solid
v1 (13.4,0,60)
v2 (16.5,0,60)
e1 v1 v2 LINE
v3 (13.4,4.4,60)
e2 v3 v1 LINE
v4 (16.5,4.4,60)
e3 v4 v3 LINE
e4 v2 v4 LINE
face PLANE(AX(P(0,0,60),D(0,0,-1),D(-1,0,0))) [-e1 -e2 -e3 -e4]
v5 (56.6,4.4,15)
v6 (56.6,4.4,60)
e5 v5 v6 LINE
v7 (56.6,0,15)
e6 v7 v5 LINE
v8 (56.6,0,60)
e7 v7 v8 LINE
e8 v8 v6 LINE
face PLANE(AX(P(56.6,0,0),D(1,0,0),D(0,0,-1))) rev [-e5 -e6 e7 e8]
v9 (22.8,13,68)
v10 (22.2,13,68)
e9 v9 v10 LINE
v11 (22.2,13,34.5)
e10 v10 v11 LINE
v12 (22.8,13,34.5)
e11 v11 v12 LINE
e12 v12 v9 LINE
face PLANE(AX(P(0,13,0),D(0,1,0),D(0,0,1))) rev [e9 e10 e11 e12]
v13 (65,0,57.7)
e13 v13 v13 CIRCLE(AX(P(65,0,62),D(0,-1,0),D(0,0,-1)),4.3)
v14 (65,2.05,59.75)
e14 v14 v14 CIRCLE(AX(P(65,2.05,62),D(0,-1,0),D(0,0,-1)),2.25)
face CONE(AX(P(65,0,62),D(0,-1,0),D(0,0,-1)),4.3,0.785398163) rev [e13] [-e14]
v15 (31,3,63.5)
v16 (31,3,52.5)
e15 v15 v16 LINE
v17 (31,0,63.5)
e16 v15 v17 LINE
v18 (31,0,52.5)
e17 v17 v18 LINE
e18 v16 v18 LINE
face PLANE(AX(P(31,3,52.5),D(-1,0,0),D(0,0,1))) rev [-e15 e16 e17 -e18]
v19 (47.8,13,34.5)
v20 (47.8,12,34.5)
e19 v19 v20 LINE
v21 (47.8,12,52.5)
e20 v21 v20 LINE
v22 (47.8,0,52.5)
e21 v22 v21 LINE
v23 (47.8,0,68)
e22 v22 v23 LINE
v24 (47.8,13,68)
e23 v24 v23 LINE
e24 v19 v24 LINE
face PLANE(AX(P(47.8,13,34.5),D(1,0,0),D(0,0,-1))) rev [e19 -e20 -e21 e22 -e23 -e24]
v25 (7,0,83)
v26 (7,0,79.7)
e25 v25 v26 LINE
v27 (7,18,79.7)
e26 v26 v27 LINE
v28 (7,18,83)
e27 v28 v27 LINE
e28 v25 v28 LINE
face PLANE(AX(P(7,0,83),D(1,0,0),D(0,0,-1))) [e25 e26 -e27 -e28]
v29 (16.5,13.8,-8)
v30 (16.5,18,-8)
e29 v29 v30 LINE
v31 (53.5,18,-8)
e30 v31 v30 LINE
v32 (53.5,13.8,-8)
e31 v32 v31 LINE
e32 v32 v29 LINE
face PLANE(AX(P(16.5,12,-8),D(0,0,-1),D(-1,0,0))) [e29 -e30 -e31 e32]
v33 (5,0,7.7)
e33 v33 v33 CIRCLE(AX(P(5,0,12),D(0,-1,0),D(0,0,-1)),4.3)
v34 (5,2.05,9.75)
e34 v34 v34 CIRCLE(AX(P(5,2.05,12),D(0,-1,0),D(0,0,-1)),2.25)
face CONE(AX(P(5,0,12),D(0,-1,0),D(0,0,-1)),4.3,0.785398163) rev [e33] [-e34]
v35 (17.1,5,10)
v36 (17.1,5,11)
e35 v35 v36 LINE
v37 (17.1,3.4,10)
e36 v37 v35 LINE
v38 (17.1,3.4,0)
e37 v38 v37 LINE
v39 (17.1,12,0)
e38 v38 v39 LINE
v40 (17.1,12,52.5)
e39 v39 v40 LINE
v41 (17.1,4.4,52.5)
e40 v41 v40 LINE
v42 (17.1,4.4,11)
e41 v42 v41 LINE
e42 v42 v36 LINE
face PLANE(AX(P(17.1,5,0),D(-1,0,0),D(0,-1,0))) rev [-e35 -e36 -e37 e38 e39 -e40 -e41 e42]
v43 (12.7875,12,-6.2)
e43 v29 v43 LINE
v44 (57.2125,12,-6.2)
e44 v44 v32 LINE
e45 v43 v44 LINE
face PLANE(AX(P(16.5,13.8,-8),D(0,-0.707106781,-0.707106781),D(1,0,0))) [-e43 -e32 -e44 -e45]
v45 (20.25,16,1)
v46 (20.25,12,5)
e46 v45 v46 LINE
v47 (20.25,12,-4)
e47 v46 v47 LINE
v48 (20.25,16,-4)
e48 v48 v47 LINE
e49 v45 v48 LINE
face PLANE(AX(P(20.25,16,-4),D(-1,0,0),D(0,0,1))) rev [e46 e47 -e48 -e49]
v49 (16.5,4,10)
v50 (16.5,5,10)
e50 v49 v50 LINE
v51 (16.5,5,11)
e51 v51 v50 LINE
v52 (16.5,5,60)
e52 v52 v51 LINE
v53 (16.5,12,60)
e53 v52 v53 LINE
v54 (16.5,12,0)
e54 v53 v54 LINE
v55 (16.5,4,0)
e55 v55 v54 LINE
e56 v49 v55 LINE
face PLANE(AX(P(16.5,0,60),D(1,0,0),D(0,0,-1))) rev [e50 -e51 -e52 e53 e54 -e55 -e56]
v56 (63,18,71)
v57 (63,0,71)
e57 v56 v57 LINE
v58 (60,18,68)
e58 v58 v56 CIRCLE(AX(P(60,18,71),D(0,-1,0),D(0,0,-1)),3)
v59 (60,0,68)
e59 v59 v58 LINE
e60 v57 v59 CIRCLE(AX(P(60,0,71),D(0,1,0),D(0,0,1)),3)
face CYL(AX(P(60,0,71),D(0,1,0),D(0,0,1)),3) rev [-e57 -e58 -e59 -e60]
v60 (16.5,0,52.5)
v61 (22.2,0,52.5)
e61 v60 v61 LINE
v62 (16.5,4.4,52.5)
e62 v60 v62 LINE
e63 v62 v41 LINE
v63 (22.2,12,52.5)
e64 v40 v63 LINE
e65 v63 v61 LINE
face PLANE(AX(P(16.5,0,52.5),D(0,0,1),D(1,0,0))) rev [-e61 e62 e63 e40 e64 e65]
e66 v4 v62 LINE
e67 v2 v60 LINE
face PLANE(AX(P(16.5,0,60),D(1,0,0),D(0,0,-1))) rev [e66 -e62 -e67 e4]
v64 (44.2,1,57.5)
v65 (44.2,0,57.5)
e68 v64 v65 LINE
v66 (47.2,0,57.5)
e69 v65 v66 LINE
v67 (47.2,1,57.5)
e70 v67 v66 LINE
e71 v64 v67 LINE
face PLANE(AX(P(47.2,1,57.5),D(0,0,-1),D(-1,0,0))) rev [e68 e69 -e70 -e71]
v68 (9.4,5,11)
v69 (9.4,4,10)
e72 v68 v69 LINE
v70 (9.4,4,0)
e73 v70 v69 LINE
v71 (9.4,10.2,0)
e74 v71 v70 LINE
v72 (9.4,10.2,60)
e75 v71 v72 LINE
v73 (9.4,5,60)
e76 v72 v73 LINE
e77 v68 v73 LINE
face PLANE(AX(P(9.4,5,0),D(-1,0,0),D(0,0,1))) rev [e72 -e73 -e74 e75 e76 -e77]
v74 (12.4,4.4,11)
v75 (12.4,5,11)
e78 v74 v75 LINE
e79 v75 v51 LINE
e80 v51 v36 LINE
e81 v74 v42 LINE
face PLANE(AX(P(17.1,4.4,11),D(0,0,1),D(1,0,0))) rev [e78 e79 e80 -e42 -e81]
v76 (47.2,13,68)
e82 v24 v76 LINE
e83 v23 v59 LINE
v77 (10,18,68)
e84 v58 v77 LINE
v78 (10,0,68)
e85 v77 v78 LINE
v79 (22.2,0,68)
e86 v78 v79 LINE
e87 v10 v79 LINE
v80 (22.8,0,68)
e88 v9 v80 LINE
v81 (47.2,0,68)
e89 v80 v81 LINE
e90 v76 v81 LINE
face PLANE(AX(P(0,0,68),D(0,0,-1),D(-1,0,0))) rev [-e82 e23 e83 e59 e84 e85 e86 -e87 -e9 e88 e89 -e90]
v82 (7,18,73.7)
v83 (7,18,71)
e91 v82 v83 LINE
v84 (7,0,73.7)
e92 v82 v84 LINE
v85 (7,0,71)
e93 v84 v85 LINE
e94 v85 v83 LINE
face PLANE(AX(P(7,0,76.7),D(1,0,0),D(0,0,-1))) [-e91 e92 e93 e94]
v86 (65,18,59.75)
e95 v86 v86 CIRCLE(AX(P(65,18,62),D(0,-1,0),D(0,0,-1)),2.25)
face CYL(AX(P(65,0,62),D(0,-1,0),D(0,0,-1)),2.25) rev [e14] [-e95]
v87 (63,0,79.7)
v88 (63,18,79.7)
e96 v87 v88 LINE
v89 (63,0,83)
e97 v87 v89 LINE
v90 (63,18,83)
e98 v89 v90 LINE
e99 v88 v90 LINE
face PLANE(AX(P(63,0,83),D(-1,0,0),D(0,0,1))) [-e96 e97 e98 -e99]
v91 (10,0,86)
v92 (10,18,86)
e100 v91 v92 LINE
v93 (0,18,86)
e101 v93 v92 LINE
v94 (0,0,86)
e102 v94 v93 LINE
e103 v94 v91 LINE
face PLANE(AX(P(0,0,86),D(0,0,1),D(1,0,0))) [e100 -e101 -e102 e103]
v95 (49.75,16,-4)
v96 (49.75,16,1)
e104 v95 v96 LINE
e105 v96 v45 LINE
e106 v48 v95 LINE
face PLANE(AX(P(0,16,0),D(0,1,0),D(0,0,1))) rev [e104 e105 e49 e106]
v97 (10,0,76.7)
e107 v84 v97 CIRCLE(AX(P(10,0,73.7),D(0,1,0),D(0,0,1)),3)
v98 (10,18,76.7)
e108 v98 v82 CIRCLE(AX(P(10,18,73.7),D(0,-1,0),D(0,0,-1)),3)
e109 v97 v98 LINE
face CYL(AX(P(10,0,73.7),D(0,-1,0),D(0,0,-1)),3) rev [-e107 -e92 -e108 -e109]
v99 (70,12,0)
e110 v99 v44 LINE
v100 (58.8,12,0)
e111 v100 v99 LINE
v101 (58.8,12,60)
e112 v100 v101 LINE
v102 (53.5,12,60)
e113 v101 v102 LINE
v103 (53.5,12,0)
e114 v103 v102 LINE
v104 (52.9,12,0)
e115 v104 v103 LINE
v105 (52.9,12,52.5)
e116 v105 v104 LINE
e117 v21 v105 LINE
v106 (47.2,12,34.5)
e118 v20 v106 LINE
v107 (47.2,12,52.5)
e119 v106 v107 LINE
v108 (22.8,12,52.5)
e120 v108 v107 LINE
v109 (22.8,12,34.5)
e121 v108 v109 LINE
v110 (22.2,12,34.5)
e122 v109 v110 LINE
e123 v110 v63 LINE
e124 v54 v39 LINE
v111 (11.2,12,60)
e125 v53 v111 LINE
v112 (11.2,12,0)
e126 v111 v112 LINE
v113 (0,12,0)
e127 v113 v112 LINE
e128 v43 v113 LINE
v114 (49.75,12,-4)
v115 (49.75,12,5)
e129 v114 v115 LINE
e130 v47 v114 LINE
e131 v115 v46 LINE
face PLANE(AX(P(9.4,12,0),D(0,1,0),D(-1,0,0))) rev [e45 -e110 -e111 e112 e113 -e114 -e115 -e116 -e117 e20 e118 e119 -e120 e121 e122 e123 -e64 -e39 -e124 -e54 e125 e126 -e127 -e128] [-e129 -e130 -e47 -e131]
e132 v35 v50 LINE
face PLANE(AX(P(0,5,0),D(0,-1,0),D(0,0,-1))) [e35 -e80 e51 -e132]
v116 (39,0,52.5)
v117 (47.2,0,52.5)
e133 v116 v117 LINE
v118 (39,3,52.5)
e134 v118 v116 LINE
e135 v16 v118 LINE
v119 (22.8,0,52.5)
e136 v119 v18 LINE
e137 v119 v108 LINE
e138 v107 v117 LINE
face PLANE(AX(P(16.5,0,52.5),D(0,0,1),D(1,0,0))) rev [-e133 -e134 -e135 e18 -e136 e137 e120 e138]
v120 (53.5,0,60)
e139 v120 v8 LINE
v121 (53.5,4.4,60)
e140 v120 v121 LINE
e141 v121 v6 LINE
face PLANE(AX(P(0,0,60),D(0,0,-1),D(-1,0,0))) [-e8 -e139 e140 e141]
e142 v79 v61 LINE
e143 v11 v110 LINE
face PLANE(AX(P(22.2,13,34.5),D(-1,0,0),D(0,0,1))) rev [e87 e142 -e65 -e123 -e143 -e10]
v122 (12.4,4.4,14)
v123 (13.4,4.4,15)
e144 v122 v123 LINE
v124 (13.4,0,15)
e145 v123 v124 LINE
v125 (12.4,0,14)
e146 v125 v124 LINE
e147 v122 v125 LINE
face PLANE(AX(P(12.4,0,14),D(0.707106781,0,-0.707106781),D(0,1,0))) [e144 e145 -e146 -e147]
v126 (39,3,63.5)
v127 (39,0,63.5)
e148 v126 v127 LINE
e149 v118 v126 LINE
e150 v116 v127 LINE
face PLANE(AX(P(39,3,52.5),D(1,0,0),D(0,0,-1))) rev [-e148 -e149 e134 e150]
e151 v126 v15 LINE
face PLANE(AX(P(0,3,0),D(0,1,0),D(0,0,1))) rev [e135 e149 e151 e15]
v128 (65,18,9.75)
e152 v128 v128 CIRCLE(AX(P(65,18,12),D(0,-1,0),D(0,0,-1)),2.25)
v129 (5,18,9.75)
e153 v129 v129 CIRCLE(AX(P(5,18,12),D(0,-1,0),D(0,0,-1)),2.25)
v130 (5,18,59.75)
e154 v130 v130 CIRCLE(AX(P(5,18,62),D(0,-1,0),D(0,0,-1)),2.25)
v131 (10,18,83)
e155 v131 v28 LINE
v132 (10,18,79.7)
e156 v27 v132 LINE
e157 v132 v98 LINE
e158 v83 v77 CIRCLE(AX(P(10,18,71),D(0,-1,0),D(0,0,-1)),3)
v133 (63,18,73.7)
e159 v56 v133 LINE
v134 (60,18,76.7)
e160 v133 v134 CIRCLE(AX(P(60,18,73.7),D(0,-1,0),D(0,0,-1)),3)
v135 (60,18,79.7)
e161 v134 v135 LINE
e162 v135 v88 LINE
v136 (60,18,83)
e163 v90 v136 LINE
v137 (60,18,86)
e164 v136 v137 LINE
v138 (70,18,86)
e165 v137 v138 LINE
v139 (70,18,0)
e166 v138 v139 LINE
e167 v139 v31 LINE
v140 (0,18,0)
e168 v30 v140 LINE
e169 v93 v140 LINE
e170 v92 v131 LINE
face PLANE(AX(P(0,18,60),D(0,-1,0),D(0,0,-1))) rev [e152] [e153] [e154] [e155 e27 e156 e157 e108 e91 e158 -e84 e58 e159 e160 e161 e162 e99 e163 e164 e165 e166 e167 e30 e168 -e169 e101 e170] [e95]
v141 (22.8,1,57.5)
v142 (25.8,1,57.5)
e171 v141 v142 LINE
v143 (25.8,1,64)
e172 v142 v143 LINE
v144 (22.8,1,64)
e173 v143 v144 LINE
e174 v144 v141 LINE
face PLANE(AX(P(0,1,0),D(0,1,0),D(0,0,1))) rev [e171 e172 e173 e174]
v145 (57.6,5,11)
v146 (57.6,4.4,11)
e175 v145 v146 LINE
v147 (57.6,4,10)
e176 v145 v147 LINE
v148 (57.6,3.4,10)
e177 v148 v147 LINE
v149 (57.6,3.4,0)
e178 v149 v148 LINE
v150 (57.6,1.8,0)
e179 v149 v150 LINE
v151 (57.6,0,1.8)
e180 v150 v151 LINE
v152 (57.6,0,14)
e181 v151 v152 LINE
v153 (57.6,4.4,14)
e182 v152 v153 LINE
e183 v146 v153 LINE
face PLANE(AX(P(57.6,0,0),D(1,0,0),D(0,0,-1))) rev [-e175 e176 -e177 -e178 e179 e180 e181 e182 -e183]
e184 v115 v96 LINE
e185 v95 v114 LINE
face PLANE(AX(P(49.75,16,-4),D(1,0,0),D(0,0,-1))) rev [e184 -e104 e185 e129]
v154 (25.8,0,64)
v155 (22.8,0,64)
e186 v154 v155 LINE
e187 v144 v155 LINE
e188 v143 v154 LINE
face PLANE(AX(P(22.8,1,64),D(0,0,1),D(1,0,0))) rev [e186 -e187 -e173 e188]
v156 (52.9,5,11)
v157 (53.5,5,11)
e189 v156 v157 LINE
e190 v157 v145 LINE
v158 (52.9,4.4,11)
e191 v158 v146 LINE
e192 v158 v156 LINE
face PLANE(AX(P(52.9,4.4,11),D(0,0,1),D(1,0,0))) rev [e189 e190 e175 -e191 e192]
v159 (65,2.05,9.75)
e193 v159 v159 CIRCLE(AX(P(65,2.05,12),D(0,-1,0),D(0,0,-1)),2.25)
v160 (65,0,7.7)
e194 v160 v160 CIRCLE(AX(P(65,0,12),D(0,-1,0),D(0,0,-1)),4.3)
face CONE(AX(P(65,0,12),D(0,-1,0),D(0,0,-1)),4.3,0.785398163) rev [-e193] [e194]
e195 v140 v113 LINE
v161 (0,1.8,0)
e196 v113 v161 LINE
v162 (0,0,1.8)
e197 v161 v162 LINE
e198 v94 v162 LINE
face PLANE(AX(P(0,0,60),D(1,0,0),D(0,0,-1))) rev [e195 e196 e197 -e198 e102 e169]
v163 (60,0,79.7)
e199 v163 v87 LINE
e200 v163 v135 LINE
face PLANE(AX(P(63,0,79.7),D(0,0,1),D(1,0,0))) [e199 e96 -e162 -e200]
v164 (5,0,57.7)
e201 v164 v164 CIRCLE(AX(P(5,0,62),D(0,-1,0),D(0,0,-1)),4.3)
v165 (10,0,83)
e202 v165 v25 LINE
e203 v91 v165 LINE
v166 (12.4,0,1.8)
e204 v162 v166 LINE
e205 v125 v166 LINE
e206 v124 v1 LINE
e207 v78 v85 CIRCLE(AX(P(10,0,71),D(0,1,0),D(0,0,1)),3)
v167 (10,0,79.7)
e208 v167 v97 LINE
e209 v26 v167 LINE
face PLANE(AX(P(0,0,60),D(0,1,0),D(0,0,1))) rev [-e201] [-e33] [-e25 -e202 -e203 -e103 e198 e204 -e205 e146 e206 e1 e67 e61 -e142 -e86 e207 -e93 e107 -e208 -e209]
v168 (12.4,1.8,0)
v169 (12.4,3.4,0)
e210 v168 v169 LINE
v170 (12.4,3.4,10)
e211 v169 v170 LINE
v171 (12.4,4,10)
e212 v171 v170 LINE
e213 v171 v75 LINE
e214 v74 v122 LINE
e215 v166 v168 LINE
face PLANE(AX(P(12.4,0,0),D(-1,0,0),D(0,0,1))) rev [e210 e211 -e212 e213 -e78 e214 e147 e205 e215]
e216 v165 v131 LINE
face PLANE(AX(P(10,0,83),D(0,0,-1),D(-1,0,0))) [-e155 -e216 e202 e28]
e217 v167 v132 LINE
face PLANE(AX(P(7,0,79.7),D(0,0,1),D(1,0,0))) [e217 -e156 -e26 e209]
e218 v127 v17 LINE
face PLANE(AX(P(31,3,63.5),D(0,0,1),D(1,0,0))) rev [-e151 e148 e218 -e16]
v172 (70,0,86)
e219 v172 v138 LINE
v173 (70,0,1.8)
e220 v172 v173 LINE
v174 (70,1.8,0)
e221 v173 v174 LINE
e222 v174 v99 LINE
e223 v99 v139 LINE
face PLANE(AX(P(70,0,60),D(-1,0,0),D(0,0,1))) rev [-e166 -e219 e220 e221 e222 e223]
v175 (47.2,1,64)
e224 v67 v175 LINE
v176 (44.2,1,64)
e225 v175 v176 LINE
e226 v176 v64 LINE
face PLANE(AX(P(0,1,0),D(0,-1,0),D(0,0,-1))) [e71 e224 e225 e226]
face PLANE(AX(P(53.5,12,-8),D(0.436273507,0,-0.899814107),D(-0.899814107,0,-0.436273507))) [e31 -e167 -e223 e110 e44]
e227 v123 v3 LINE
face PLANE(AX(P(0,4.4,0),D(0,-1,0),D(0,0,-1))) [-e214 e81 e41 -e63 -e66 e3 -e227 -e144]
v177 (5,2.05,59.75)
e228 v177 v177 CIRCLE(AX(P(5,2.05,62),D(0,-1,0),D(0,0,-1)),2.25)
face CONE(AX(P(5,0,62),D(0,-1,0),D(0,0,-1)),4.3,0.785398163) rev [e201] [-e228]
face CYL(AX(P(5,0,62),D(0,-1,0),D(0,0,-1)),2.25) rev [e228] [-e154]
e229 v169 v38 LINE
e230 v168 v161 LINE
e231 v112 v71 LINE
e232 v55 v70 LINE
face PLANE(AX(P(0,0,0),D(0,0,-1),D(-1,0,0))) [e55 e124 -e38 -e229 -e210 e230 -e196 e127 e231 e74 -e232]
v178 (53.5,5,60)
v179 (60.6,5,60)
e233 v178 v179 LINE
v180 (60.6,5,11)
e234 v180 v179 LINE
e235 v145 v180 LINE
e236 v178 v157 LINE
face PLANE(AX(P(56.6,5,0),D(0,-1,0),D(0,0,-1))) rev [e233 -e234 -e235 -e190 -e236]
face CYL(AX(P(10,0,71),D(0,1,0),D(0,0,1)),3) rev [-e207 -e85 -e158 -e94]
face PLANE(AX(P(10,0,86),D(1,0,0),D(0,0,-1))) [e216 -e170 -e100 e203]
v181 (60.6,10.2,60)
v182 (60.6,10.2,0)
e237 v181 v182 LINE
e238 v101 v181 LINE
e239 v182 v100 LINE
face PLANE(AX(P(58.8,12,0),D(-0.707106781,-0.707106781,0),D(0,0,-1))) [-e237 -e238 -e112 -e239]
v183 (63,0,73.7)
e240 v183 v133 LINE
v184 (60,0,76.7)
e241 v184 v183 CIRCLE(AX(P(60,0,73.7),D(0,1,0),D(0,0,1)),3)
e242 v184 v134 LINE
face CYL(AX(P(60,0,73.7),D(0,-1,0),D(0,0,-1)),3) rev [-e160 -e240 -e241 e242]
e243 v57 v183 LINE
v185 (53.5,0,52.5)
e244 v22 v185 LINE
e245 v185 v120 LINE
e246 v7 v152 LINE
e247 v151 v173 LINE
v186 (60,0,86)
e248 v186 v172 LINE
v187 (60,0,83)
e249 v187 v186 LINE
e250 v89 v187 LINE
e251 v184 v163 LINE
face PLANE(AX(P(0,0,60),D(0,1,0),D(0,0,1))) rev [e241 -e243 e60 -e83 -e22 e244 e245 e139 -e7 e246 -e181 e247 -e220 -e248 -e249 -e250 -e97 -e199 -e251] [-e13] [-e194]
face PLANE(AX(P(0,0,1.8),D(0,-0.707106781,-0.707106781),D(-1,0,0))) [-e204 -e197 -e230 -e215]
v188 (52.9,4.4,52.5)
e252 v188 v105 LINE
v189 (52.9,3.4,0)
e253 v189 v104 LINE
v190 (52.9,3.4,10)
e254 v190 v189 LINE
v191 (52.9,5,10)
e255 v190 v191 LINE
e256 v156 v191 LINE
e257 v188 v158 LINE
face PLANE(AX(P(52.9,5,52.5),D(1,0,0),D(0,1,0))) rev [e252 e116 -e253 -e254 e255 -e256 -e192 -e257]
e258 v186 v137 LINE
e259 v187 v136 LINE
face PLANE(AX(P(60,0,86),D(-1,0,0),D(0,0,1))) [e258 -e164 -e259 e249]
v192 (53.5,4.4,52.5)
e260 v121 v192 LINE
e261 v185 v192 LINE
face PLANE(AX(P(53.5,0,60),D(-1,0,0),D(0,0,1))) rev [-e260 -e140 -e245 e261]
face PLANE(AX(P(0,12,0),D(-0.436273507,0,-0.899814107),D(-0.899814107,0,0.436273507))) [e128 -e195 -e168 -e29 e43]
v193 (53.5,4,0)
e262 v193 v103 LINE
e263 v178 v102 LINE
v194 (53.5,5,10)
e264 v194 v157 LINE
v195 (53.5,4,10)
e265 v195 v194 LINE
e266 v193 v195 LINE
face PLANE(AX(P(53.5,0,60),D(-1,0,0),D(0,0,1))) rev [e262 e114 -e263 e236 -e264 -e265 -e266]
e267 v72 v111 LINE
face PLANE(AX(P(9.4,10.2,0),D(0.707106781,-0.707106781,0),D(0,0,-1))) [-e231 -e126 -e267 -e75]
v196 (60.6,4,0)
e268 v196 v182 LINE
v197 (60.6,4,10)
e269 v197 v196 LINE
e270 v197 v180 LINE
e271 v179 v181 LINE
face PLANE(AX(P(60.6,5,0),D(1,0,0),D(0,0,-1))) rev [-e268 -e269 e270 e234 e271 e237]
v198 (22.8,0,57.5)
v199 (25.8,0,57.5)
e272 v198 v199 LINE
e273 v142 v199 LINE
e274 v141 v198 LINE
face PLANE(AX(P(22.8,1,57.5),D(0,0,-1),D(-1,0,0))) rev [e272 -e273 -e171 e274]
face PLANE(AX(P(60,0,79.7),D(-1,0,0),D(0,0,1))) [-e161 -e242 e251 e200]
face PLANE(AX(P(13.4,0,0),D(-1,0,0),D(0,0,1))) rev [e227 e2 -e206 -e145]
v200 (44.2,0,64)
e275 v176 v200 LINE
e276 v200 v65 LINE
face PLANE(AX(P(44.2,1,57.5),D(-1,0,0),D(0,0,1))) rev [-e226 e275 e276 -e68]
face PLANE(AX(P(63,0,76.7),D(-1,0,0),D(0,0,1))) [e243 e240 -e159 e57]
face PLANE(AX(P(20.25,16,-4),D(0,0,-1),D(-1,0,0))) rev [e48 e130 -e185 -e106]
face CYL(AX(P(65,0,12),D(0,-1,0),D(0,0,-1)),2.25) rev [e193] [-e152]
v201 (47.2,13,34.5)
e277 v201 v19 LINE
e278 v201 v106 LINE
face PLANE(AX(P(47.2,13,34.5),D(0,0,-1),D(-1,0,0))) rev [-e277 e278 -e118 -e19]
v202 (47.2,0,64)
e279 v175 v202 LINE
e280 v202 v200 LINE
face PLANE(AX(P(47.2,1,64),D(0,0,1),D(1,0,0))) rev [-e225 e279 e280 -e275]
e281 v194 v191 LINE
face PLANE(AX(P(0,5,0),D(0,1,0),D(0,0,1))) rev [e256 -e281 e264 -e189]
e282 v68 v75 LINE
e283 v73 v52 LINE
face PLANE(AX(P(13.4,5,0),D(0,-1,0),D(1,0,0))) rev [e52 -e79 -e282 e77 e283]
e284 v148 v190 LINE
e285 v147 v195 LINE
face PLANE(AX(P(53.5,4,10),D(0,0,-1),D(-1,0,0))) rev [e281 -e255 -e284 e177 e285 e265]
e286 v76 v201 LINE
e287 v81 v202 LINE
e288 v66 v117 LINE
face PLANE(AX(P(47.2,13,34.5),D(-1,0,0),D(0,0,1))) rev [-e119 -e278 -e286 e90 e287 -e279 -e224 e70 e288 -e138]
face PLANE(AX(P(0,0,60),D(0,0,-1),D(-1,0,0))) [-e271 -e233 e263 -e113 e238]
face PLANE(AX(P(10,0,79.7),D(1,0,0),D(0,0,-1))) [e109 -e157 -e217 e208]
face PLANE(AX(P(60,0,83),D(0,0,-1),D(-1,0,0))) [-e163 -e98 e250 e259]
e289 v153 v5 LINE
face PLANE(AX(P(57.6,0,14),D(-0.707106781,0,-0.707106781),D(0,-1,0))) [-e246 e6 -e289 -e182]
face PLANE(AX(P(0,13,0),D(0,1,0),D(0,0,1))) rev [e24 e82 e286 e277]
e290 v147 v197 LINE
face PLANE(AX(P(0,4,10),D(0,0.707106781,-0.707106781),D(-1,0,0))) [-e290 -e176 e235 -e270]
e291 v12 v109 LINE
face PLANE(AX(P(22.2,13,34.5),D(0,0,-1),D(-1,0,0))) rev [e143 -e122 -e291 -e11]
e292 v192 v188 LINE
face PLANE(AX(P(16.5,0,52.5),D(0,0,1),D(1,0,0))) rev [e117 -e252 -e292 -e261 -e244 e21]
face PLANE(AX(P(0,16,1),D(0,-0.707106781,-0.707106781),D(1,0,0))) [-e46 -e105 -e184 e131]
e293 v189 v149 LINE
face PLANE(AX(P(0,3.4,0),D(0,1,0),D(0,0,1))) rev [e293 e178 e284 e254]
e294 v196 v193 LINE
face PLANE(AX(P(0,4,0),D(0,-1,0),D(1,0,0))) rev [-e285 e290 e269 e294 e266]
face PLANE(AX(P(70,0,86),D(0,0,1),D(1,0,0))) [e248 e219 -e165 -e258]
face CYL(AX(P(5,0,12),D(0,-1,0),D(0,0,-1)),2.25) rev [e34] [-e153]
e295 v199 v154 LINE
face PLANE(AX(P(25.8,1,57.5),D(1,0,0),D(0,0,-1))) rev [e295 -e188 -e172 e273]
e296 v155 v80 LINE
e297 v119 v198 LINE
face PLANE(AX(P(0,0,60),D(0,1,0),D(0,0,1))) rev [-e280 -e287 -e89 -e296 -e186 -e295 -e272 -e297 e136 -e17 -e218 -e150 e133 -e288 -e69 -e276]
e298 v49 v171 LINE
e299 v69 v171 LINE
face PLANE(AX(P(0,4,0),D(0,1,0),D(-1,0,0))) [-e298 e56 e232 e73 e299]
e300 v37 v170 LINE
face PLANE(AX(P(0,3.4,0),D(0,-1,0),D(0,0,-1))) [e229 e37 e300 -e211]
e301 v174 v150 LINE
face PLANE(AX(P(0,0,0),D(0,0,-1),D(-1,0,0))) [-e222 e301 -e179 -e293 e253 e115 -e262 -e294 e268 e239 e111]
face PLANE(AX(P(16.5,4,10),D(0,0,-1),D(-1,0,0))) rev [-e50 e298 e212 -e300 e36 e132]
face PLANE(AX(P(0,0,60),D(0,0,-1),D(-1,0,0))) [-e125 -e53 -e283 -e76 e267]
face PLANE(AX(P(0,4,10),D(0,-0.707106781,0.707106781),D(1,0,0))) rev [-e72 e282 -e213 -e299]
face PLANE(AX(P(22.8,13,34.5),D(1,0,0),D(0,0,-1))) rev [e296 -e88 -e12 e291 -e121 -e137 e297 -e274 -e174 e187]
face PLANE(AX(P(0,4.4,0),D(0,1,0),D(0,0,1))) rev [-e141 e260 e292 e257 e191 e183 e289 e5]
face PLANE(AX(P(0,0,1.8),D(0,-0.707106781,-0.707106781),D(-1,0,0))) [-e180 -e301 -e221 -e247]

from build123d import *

# Parameters (mm, degrees)
SKETCH_1_W                = 70
SKETCH_1_H                = 18
EXTRUDE_1_DEPTH           = 60
CUT_EXTRUDE_1_DEPTH       = 94.936148527
SKETCH_3_W                = 15
SKETCH_3_H                = 5
CUT_EXTRUDE_2_DEPTH       = 1
SKETCH_4_W                = 15
SKETCH_4_H                = 5
CUT_EXTRUDE_3_DEPTH       = 1
SKETCH_5_W                = 3
SKETCH_5_H                = 11
CUT_EXTRUDE_4_DEPTH       = 1
SKETCH_6_W                = 3
SKETCH_6_H                = 11
CUT_EXTRUDE_5_DEPTH       = 1
CHAMFER_1_SIZE            = 1
EXTRUDE_9_DEPTH           = 6
SKETCH_7_W                = 29.5
SKETCH_7_H                = 9
CUT_EXTRUDE_7_DEPTH       = 4
SKETCH_9_W                = 37
SKETCH_9_H                = 7.5
EXTRUDE_3_DEPTH           = 12
SKETCH_10_W               = 70
SKETCH_10_H               = 18
EXTRUDE_4_DEPTH           = 8
CHAMFER_4_SIZE            = 4
SKETCH_11_W               = 8
SKETCH_11_H               = 11
CUT_EXTRUDE_8_DEPTH       = 3
SKETCH_12_W               = 0.6
SKETCH_12_H               = 33.5
CUT_EXTRUDE_9_DEPTH       = 13
SKETCH_13_W               = 0.6
SKETCH_13_H               = 52.5
EXTRUDE_5_DEPTH           = 7
SKETCH_14_W               = 0.6
SKETCH_14_H               = 10
EXTRUDE_6_DEPTH           = 1
SKETCH_15_W               = 7.7
SKETCH_15_H               = 49
EXTRUDE_7_DEPTH           = 0.6
SKETCH_18_W               = 7.7
SKETCH_18_H               = 10
EXTRUDE_8_DEPTH           = 0.6
CHAMFER_5_SIZE            = 1.8
SKETCH_22_W               = 3
SKETCH_22_H               = 6.5
CUT_EXTRUDE_10_DEPTH      = 1
EXTRUDE_10_DEPTH          = 18
FILLET_1_R                = 3
HOLE_WIZARD_2_D           = 4.5
HOLE_WIZARD_2_CSINK_D     = 8.6
HOLE_WIZARD_2_CSINK_ANGLE = 90


with BuildPart() as part:
    # 草图1 → 凸台-拉伸1 (new body)
    with BuildSketch(Plane.XY):
        with Locations((35, 9)):
            Rectangle(SKETCH_1_W, SKETCH_1_H)
    extrude(amount=EXTRUDE_1_DEPTH)

    # 草图2 → 切除-拉伸1 (cut, through all)
    with BuildSketch(Plane.XY.offset(60)):
        Polygon((13.4, 0), (13.4, 5), (9.4, 5), (9.4, 12), (60.6, 12), (60.6, 5), (56.6, 5), (56.6, 0), align=None)
    extrude(amount=-CUT_EXTRUDE_1_DEPTH, mode=Mode.SUBTRACT)

    # 草图3 → 切除-拉伸2 (cut)
    with BuildSketch(Plane(origin=(13.4, 0, 0), x_dir=(0, 0, -1), z_dir=(1, 0, 0))):
        with Locations((-7.5, 2.5)):
            Rectangle(SKETCH_3_W, SKETCH_3_H)
    extrude(amount=-CUT_EXTRUDE_2_DEPTH, mode=Mode.SUBTRACT)

    # 草图4 → 切除-拉伸3 (cut)
    with BuildSketch(Plane.ZY.offset(-56.6)):
        with Locations((7.5, 2.5)):
            Rectangle(SKETCH_4_W, SKETCH_4_H)
    extrude(amount=-CUT_EXTRUDE_3_DEPTH, mode=Mode.SUBTRACT)

    # 草图5 → 切除-拉伸4 (cut)
    with BuildSketch(Plane(origin=(0, 5, 0), x_dir=(1, 0, 0), z_dir=(0, 1, 0))):
        with Locations((59.1, -5.5)):
            Rectangle(SKETCH_5_W, SKETCH_5_H)
    extrude(amount=-CUT_EXTRUDE_4_DEPTH, mode=Mode.SUBTRACT)

    # 草图6 → 切除-拉伸5 (cut)
    with BuildSketch(Plane(origin=(0, 5, 0), x_dir=(1, 0, 0), z_dir=(0, 1, 0))):
        with Locations((10.9, -5.5)):
            Rectangle(SKETCH_6_W, SKETCH_6_H)
    extrude(amount=-CUT_EXTRUDE_5_DEPTH, mode=Mode.SUBTRACT)

    # 倒角1
    chamfer_1_edges = [part.edges().sort_by_distance(p)[0] for p in [
        (59.1, 4, 11),
        (10.9, 4, 11),
        (12.4, 2.5, 15),
        (57.6, 2.5, 15),
    ]]
    chamfer(chamfer_1_edges, length=CHAMFER_1_SIZE - 0.0001)  # a hair under: the kernel refuses the full size

    # 草图21 → 凸台-拉伸9 (add)
    with BuildSketch(Plane(origin=(0, 18, 0), x_dir=(1, 0, 0), z_dir=(0, 1, 0))):
        Polygon((0, 0), (16.5, 8), (53.5, 8), (70, 0), align=None)
    extrude(amount=-EXTRUDE_9_DEPTH)

    # 草图7 → 切除-拉伸7 (cut)
    with BuildSketch(Plane.XZ.offset(-12)):
        with Locations((35, 0.5)):
            Rectangle(SKETCH_7_W, SKETCH_7_H)
    extrude(amount=-CUT_EXTRUDE_7_DEPTH, mode=Mode.SUBTRACT)

    # 草图9 → 凸台-拉伸3 (add)
    with BuildSketch(Plane.XZ.offset(-12)):
        with Locations((35, 56.25)):
            Rectangle(SKETCH_9_W, SKETCH_9_H)
    extrude(amount=EXTRUDE_3_DEPTH)

    # 草图10 → 凸台-拉伸4 (add)
    with BuildSketch(Plane.XY.offset(60)):
        with Locations((35, 9)):
            Rectangle(SKETCH_10_W, SKETCH_10_H)
    extrude(amount=EXTRUDE_4_DEPTH)

    # 倒角4
    chamfer_4_edges = [part.edges().sort_by_distance(p)[0] for p in [
        (35, 16, 5),
    ]]
    chamfer(chamfer_4_edges, length=CHAMFER_4_SIZE - 0.0001)  # a hair under: the kernel refuses the full size

    # 草图11 → 切除-拉伸8 (cut)
    with BuildSketch(Plane.XZ):
        with Locations((35, 58)):
            Rectangle(SKETCH_11_W, SKETCH_11_H)
    extrude(amount=-CUT_EXTRUDE_8_DEPTH, mode=Mode.SUBTRACT)

    # 草图12 → 切除-拉伸9 (cut)
    with BuildSketch(Plane.XZ):
        with Locations((22.5, 51.25)):
            Rectangle(SKETCH_12_W, SKETCH_12_H)
        with Locations((47.5, 51.25)):
            Rectangle(SKETCH_12_W, SKETCH_12_H)
    extrude(amount=-CUT_EXTRUDE_9_DEPTH, mode=Mode.SUBTRACT)

    # 草图13 → 凸台-拉伸5 (add)
    with BuildSketch(Plane.XZ.offset(-12)):
        with Locations((16.8, 26.25)):
            Rectangle(SKETCH_13_W, SKETCH_13_H)
        with Locations((53.2, 26.25)):
            Rectangle(SKETCH_13_W, SKETCH_13_H)
    extrude(amount=EXTRUDE_5_DEPTH)

    # 草图14 → 凸台-拉伸6 (add)
    with BuildSketch(Plane.XZ.offset(-5)):
        with Locations((16.8, 5)):
            Rectangle(SKETCH_14_W, SKETCH_14_H)
        with Locations((53.2, 5)):
            Rectangle(SKETCH_14_W, SKETCH_14_H)
    extrude(amount=EXTRUDE_6_DEPTH)

    # 草图15 → 凸台-拉伸7 (add)
    with BuildSketch(Plane.XZ.offset(-5)):
        with Locations((13.25, 35.5)):
            Rectangle(SKETCH_15_W, SKETCH_15_H)
        with Locations((56.75, 35.5)):
            Rectangle(SKETCH_15_W, SKETCH_15_H)
    extrude(amount=EXTRUDE_7_DEPTH)

    # 草图18 → 凸台-拉伸8 (add)
    with BuildSketch(Plane.XZ.offset(-4)):
        with Locations((13.25, 5)):
            Rectangle(SKETCH_18_W, SKETCH_18_H)
        with Locations((56.75, 5)):
            Rectangle(SKETCH_18_W, SKETCH_18_H)
    extrude(amount=EXTRUDE_8_DEPTH)

    # 倒角5
    chamfer_5_edges = [part.edges().sort_by_distance(p)[0] for p in [
        (35, 12, -8),
        (9.4, 12, 30),
        (60.6, 12, 30),
        (6.2, 0, 0),
        (63.8, 0, 0),
    ]]
    chamfer(chamfer_5_edges, length=CHAMFER_5_SIZE)

    # 草图22 → 切除-拉伸10 (cut)
    with BuildSketch(Plane.XZ):
        with Locations((24.3, 60.75)):
            Rectangle(SKETCH_22_W, SKETCH_22_H)
        with Locations((45.7, 60.75)):
            Rectangle(SKETCH_22_W, SKETCH_22_H)
    extrude(amount=-CUT_EXTRUDE_10_DEPTH, mode=Mode.SUBTRACT)

    # 草图23 → 凸台-拉伸10 (add)
    with BuildSketch(Plane(origin=(0, 18, 0), x_dir=(1, 0, 0), z_dir=(0, 1, 0))):
        Polygon((0, -68), (0, -86), (10, -86), (10, -83), (7, -83), (7, -79.7), (10, -79.7), (10, -76.7), (7, -76.7), (7, -68), align=None)
        Polygon((63, -68), (70, -68), (70, -86), (60, -86), (60, -83), (63, -83), (63, -79.7), (60, -79.7), (60, -76.7), (63, -76.7), align=None)
    extrude(amount=-EXTRUDE_10_DEPTH)

    # 圆角1
    fillet_1_edges = [part.edges().sort_by_distance(p)[0] for p in [
        (7, 9, 76.7),
        (7, 9, 68),
        (63, 9, 68),
        (63, 9, 76.7),
    ]]
    fillet(fillet_1_edges, radius=FILLET_1_R - 0.0001)  # a hair under: the kernel refuses the full size

    # 打孔尺寸(%根据十字)槽半沉头木螺钉的类型2 (through all)
    with Locations(Plane(origin=(0, 0, 0), x_dir=(-1, 0, 0), z_dir=(0, -1, 0))):
        with Locations((-65, -12), (-65, -62), (-5, -12), (-5, -62)):
            CounterSinkHole(HOLE_WIZARD_2_D / 2, HOLE_WIZARD_2_CSINK_D / 2, counter_sink_angle=HOLE_WIZARD_2_CSINK_ANGLE)


solid = part.part
